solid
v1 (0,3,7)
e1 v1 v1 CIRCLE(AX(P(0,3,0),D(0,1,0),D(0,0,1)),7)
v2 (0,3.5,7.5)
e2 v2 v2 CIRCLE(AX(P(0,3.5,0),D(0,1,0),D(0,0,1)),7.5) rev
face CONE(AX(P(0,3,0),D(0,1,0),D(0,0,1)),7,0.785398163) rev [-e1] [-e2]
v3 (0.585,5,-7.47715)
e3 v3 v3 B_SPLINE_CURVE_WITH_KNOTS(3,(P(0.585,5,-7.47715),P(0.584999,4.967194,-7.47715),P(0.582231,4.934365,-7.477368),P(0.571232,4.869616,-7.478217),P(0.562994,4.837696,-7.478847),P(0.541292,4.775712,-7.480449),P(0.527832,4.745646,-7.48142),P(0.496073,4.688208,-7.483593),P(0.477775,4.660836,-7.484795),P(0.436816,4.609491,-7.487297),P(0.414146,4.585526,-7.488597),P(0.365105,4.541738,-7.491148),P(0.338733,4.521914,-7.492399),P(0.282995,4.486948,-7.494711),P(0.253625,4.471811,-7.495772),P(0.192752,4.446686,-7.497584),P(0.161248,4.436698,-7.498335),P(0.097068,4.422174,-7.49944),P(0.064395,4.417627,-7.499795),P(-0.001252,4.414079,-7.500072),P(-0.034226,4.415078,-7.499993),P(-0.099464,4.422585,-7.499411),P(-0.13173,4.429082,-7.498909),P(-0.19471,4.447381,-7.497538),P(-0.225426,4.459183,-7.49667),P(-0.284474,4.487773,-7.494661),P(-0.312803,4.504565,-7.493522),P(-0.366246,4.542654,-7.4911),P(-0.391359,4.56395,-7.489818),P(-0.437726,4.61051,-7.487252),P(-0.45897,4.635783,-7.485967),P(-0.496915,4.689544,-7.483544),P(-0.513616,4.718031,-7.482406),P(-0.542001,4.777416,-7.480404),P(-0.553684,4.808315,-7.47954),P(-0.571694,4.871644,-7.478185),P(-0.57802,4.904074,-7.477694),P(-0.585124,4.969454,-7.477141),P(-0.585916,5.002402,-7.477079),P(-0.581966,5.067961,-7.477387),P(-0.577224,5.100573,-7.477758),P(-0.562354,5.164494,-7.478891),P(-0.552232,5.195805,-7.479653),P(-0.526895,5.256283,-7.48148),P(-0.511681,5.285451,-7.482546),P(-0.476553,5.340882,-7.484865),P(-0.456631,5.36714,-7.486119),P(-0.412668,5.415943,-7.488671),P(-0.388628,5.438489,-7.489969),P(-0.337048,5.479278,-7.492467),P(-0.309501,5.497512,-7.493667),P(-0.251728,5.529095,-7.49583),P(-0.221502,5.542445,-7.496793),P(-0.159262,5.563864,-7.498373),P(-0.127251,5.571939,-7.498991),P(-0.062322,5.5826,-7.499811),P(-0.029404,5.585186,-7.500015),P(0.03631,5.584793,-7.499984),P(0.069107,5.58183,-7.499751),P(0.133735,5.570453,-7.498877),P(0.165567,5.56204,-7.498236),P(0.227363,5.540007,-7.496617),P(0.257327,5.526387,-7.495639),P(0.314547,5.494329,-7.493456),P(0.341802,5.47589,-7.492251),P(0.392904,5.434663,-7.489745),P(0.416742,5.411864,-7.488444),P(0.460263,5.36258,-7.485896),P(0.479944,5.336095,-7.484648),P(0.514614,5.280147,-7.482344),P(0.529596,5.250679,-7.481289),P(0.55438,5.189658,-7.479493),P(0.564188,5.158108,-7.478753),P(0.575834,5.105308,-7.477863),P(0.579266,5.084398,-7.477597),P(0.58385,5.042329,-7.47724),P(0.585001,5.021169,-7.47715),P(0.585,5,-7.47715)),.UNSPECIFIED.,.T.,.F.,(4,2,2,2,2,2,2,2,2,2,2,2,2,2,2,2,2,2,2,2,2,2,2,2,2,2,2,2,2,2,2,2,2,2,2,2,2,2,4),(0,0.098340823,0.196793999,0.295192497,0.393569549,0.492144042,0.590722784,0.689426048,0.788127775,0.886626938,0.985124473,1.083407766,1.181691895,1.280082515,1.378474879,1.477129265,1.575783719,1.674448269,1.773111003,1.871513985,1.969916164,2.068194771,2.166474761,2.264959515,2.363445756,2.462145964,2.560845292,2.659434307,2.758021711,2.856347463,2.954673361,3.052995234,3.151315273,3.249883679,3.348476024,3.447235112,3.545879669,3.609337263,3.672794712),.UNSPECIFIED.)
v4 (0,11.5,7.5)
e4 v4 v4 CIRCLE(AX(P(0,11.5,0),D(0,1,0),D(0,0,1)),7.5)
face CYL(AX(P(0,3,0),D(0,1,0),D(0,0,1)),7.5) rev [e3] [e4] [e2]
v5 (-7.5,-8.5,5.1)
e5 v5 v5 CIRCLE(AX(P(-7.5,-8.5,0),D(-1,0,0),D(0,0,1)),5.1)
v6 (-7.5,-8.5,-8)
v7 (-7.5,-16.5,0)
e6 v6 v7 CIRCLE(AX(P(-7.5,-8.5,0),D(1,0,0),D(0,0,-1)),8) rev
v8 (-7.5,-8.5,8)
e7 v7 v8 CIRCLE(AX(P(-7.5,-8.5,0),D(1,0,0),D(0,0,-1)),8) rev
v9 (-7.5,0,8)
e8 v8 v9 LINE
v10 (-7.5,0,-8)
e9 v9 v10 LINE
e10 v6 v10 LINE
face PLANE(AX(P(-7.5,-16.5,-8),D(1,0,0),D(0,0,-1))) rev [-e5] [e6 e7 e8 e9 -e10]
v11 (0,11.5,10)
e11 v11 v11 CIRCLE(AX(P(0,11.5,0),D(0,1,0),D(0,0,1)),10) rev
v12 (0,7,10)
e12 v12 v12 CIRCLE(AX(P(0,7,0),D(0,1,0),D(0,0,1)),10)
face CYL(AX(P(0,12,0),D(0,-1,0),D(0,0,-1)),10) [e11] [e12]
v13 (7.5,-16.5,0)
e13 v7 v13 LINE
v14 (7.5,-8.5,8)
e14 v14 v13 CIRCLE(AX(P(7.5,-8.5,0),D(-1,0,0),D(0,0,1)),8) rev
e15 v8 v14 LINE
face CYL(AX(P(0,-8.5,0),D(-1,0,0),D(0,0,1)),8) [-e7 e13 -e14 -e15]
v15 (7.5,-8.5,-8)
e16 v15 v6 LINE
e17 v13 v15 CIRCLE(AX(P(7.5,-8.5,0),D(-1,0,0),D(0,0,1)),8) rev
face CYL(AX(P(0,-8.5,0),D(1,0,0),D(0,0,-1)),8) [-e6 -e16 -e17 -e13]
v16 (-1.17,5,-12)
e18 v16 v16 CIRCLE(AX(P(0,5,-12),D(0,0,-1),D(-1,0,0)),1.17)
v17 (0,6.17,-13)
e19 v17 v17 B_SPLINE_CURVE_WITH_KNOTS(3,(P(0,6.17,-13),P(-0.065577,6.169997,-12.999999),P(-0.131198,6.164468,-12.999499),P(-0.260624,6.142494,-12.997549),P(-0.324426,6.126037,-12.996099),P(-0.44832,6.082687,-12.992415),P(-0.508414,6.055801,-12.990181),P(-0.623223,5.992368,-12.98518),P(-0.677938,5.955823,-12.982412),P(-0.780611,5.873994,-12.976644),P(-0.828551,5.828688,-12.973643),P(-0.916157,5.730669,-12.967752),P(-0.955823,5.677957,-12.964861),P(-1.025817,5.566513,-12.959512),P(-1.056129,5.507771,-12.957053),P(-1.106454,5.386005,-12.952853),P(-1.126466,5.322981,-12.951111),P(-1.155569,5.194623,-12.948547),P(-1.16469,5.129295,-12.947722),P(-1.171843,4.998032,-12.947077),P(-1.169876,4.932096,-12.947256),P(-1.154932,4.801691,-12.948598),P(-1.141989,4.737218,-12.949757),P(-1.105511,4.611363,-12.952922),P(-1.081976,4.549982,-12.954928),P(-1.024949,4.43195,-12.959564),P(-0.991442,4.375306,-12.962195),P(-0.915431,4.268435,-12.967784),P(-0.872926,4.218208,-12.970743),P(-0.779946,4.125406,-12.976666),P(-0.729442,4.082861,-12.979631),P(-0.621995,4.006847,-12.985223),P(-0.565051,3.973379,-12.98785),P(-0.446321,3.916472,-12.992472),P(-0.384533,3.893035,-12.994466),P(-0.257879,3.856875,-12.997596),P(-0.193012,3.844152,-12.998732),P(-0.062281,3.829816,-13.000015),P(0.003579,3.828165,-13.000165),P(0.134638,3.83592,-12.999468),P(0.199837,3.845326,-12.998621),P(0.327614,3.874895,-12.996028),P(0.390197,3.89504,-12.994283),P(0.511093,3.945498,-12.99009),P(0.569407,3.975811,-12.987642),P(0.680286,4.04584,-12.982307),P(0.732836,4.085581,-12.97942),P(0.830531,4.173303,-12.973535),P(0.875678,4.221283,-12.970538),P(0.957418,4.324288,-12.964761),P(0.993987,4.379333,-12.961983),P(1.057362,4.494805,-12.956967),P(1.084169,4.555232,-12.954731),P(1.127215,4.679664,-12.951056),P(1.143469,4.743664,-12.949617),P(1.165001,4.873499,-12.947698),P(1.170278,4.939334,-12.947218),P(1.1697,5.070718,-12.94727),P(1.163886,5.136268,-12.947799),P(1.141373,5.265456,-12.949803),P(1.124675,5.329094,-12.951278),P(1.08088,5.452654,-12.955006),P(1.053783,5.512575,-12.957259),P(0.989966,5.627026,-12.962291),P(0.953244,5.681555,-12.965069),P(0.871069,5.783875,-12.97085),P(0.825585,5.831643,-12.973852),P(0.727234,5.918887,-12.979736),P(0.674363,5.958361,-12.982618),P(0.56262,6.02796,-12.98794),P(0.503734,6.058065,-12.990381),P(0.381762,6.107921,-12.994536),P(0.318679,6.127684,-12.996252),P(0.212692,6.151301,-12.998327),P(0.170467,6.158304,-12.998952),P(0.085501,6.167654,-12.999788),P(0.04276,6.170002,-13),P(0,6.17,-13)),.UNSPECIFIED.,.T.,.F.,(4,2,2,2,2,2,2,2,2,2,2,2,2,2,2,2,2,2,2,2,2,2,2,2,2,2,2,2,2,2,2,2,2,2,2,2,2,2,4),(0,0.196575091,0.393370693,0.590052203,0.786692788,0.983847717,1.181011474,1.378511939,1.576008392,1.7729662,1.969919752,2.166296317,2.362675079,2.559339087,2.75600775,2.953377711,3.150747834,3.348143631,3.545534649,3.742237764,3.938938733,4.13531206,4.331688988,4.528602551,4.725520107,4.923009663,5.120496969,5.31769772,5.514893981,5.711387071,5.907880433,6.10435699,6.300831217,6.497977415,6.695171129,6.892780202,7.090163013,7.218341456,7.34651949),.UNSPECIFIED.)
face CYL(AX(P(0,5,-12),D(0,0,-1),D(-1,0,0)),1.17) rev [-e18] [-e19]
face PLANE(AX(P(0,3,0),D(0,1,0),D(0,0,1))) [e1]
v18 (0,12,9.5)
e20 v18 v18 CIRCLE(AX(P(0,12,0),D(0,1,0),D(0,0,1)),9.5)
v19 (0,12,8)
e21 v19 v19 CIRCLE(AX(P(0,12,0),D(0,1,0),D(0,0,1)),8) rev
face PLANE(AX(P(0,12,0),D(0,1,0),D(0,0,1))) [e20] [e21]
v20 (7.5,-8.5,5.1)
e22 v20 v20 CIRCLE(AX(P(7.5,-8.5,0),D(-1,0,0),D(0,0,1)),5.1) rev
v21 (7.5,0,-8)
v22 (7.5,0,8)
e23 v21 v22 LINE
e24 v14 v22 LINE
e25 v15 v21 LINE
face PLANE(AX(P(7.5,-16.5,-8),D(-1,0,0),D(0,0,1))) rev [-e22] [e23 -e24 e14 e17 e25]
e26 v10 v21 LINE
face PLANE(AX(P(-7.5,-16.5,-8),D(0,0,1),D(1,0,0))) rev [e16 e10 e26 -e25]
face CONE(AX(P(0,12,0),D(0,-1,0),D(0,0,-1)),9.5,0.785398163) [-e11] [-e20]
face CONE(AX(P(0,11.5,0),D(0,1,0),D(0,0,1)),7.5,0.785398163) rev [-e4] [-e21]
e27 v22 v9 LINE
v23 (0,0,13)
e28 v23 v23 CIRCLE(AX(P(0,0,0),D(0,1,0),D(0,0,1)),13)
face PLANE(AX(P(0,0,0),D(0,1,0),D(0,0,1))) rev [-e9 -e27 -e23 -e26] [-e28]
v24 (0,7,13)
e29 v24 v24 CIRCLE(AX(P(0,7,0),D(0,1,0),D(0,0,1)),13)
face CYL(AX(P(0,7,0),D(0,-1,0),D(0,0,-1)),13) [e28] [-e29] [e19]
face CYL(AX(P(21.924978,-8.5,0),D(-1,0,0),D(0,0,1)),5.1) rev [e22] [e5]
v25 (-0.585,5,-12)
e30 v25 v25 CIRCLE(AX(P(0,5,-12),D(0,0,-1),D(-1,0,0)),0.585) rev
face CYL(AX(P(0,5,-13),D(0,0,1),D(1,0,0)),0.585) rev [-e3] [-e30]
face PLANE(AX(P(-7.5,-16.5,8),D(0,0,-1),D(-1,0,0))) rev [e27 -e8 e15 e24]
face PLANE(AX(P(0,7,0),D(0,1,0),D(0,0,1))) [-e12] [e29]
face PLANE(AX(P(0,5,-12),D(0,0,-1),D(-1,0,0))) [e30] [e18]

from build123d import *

# Parameters (mm, degrees)
SKETCH1_R           = 13
BOSS_EXTRUDE1_DEPTH = 7
SKETCH2_R           = 10
BOSS_EXTRUDE2_DEPTH = 5
SKETCH3_R           = 7.5
CUT_EXTRUDE1_DEPTH  = 9
CHAMFER1_SIZE       = 0.5
SKETCH4_R           = 0.585
CUT_EXTRUDE2_DEPTH  = 22.9544984
SKETCH5_W           = 15
SKETCH5_H           = 16
BOSS_EXTRUDE3_DEPTH = 16.5
FILLET1_R           = 8
SKETCH8_R           = 5.1
CUT_EXTRUDE4_DEPTH  = 15
SKETCH9_R           = 1.17
CUT_EXTRUDE5_DEPTH  = 1


with BuildPart() as part:
    # Sketch1 → Boss-Extrude1 (new body)
    with BuildSketch(Plane(origin=(0, 0, 0), x_dir=(1, 0, 0), z_dir=(0, 1, 0))):
        with Locations(Location((0, 0, 0), (0, 0, 270))):
            Circle(SKETCH1_R)
    extrude(amount=BOSS_EXTRUDE1_DEPTH)

    # Sketch2 → Boss-Extrude2 (add)
    with BuildSketch(Plane(origin=(0, 7, 0), x_dir=(1, 0, 0), z_dir=(0, 1, 0))):
        with Locations(Location((0, 0, 0), (0, 0, 270))):
            Circle(SKETCH2_R)
    extrude(amount=BOSS_EXTRUDE2_DEPTH)

    # Sketch3 → Cut-Extrude1 (cut)
    with BuildSketch(Plane(origin=(0, 12, 0), x_dir=(1, 0, 0), z_dir=(0, 1, 0))):
        with Locations(Location((0, 0, 0), (0, 0, 270))):
            Circle(SKETCH3_R)
    extrude(amount=-CUT_EXTRUDE1_DEPTH, mode=Mode.SUBTRACT)

    # Chamfer1
    chamfer1_edges = [part.edges().sort_by_distance(p)[0] for p in [
        (0, 3, -7.5),
        (0, 12, -7.5),
        (0, 12, -10),
    ]]
    chamfer(chamfer1_edges, length=CHAMFER1_SIZE)

    # Sketch4 → Cut-Extrude2 (cut, through all)
    with BuildSketch(Plane.XY):
        with Locations((0, 5)):
            Circle(SKETCH4_R)
    extrude(amount=-CUT_EXTRUDE2_DEPTH, mode=Mode.SUBTRACT)

    # Sketch5 → Boss-Extrude3 (add)
    with BuildSketch(Plane.XZ):
        Rectangle(SKETCH5_W, SKETCH5_H)
    extrude(amount=BOSS_EXTRUDE3_DEPTH)

    # Fillet1
    fillet1_edges = [part.edges().sort_by_distance(p)[0] for p in [
        (0, -16.5, 8),
        (0, -16.5, -8),
    ]]
    fillet(fillet1_edges, radius=FILLET1_R - 0.0001)  # a hair under: the kernel refuses the full size

    # Sketch8 → Cut-Extrude4 (cut)
    with BuildSketch(Plane.ZY.offset(7.5)):
        with Locations((0, -8.5)):
            Circle(SKETCH8_R)
    extrude(amount=-CUT_EXTRUDE4_DEPTH, mode=Mode.SUBTRACT)

    # Sketch9 → Cut-Extrude5 (cut)
    with BuildSketch(Plane(origin=(0, 0, -13), x_dir=(-1, 0, 0), z_dir=(0, 0, -1))):
        with Locations((0, 5)):
            Circle(SKETCH9_R)
    extrude(amount=-CUT_EXTRUDE5_DEPTH, mode=Mode.SUBTRACT)


solid = part.part
